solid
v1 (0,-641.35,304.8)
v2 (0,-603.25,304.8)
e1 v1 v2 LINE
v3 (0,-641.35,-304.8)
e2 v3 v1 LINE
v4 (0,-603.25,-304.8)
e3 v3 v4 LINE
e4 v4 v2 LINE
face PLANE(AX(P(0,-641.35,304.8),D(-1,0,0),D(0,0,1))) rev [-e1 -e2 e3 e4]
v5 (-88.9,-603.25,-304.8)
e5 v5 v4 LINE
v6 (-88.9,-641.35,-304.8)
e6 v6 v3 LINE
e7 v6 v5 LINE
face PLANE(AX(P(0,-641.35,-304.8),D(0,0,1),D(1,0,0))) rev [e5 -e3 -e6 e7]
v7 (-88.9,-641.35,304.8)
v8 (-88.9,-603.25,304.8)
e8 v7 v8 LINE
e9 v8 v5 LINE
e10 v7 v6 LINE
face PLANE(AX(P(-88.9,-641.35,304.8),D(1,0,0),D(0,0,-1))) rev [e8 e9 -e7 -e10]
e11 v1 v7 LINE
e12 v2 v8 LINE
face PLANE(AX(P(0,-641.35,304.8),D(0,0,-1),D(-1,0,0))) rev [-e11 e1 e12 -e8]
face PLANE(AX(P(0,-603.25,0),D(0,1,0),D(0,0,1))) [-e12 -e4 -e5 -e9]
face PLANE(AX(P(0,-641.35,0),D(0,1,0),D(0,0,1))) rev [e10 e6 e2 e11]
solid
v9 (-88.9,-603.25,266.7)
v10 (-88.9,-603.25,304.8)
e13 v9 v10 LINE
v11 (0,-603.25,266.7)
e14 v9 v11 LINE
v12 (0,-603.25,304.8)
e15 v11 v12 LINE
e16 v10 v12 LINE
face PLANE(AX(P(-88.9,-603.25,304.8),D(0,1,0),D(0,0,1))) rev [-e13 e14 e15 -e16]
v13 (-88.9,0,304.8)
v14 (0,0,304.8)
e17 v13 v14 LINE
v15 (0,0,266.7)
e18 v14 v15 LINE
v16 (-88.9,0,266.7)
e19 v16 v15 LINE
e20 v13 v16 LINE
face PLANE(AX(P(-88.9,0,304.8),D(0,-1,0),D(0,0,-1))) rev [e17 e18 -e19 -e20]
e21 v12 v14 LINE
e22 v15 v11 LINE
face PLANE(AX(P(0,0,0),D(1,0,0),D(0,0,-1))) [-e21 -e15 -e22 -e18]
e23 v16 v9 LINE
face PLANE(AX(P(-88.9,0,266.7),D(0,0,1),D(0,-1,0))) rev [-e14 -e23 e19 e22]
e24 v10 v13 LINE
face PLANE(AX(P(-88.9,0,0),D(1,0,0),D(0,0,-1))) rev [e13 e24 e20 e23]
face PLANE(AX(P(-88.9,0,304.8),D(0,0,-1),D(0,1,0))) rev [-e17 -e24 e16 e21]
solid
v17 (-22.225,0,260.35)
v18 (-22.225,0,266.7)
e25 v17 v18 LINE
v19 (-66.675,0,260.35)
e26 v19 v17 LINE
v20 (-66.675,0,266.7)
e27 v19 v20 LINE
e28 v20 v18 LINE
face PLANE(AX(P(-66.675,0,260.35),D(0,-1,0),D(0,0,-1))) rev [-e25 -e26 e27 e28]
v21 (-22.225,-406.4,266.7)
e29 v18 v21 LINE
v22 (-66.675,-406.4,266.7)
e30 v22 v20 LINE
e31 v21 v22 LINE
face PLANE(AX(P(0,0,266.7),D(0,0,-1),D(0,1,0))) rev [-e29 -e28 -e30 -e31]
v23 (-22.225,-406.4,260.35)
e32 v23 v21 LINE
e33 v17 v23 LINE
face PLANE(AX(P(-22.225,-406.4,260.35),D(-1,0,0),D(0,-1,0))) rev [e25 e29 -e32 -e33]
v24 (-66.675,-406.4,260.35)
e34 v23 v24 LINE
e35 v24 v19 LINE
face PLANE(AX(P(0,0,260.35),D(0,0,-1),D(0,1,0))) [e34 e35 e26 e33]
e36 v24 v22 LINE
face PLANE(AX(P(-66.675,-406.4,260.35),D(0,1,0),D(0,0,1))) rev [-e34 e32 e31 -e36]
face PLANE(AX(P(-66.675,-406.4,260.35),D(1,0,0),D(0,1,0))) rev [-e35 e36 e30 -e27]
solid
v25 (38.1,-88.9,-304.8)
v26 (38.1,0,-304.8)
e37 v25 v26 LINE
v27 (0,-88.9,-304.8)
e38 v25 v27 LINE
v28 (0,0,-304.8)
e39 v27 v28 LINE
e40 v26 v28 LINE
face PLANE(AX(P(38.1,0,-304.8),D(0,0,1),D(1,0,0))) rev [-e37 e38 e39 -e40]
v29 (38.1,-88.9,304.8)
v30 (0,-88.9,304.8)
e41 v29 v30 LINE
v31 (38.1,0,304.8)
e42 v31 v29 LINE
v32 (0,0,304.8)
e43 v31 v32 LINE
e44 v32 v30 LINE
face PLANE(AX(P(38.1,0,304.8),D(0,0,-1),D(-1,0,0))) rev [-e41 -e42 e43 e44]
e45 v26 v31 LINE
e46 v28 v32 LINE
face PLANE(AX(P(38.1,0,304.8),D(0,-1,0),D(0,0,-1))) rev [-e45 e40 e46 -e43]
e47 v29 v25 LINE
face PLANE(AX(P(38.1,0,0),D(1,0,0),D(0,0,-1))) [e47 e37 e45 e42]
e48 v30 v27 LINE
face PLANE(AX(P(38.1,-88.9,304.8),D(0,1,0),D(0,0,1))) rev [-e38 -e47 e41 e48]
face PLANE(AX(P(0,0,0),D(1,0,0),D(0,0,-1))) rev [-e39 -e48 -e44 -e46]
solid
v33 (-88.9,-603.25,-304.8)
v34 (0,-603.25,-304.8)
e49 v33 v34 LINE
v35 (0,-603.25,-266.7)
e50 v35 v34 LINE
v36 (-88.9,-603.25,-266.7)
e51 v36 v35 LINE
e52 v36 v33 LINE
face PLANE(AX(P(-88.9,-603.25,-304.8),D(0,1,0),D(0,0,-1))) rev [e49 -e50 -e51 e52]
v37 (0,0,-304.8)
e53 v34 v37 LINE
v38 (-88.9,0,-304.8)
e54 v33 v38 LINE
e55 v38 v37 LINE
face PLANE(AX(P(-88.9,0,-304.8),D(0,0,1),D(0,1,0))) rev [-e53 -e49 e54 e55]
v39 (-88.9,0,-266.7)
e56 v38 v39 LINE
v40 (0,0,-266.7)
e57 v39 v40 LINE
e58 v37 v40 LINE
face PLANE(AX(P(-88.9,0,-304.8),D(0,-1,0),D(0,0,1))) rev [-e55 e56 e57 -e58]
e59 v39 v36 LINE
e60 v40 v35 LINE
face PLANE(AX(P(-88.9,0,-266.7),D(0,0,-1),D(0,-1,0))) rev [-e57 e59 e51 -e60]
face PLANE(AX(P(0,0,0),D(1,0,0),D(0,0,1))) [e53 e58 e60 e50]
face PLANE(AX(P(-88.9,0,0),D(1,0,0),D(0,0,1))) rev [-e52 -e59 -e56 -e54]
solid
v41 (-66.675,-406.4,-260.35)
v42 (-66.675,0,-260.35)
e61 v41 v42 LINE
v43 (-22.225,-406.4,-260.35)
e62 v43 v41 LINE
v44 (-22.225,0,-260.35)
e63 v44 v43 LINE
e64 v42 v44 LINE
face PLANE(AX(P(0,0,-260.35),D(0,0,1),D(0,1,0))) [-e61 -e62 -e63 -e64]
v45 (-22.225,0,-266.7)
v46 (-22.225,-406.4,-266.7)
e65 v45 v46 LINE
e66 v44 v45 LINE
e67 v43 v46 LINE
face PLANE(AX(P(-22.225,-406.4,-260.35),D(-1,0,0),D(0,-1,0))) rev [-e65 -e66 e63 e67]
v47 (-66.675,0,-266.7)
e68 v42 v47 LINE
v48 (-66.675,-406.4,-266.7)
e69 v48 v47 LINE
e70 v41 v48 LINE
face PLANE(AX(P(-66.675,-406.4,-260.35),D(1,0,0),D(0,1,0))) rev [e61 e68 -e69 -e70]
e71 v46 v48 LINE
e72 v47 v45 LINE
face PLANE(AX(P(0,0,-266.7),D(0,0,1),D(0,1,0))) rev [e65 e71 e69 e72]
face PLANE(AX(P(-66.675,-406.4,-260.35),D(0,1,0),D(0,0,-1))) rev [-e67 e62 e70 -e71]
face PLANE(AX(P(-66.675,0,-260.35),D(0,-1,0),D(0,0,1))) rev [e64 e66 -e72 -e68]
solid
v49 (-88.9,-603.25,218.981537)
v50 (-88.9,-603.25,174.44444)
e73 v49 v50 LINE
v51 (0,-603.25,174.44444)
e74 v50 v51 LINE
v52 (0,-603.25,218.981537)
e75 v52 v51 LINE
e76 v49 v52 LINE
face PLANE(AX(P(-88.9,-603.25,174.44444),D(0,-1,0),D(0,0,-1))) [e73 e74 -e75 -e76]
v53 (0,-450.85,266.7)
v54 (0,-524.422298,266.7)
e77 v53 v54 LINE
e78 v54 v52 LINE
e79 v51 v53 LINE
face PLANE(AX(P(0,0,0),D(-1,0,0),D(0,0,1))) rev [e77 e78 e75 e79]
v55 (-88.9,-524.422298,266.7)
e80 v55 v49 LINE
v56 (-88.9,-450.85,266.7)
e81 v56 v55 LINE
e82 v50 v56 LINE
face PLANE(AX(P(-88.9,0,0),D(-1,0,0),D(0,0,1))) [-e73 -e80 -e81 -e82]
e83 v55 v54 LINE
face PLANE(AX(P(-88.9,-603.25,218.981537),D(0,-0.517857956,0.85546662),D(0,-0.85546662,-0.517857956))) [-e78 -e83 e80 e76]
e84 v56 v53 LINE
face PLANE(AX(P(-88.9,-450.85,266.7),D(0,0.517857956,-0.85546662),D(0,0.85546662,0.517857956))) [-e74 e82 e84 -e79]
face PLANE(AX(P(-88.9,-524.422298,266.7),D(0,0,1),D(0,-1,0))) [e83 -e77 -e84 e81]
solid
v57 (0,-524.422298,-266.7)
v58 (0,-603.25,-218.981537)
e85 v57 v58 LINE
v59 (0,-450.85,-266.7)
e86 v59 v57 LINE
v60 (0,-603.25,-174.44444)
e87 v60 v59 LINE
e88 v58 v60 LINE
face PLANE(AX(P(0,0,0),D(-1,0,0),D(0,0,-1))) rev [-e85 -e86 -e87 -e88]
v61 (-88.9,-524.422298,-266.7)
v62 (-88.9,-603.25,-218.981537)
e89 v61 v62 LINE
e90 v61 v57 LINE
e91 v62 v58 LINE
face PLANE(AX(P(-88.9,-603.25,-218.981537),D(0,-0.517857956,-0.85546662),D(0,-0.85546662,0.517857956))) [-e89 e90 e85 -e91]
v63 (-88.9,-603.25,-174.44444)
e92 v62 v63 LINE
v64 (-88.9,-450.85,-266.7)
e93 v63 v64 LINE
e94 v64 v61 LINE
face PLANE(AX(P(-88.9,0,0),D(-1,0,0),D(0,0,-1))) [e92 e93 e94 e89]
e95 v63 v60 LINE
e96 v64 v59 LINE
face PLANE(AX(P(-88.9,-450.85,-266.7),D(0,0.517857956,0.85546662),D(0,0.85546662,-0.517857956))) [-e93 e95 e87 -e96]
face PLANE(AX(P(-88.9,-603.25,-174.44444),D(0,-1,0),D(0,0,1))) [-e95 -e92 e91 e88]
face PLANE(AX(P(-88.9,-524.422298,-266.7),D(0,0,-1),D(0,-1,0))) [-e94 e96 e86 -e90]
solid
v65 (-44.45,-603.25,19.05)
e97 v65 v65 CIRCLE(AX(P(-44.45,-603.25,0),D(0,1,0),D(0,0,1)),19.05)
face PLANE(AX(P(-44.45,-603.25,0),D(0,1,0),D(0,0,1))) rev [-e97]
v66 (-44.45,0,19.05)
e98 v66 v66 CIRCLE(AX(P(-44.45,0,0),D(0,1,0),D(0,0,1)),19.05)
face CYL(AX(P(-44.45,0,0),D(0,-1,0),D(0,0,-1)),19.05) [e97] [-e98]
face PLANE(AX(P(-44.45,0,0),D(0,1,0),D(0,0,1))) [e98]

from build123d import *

# Parameters (mm, degrees)
SKETCH1_W                  = 609.6
SKETCH1_H                  = 88.9
TOP_CROSS_SUPPORT_DEPTH    = 38.1
SKETCH2_W                  = 38.1
SKETCH2_H                  = 603.25
LEG_DEPTH                  = 88.9
SKETCH7_W                  = 44.45
SKETCH7_H                  = 406.4
SLIDER_GUIDE_DEPTH         = 6.35
LEG_MIRROR_START           = -304.8
LEG_MIRROR_OUTLINE_W       = 88.9
LEG_MIRROR_OUTLINE_H       = 603.25
LEG_MIRROR_DEPTH           = 38.1
SKETCH4_W                  = 88.9
SKETCH4_H                  = 609.6
BOTTOM_CROSS_SUPPORT_DEPTH = 38.1
LOW_DIAGONAL_SUPPORT_DEPTH = 88.9
SKETCH6_R                  = 19.05
ACTUATOR_DEPTH             = 603.25


# Read off the part's stored shape, not the designer's step: Leg_Mirror
with BuildPart() as part:
    # Sketch1 → Top_Cross_Support (new body)
    with BuildSketch(Plane(origin=(0, 0, 0), x_dir=(0, 0, -1), z_dir=(1, 0, 0))):
        with Locations((0, -44.45)):
            Rectangle(SKETCH1_W, SKETCH1_H)
    extrude(amount=TOP_CROSS_SUPPORT_DEPTH)


with BuildPart() as body_2:
    # Sketch2 → Leg (new body)
    with BuildSketch(Plane.ZY):
        with Locations((285.75, -301.625)):
            Rectangle(SKETCH2_W, SKETCH2_H)
    extrude(amount=LEG_DEPTH)


with BuildPart() as body_3:
    # Sketch7 → Slider_Guide (new body)
    with BuildSketch(Plane(origin=(0, 0, 266.7), x_dir=(-1, 0, 0), z_dir=(0, 0, -1))):
        with Locations((44.45, -203.2)):
            Rectangle(SKETCH7_W, SKETCH7_H)
    extrude(amount=SLIDER_GUIDE_DEPTH)


with BuildPart() as body_4:
    # Leg_Mirror outline → Leg_Mirror (new body)
    with BuildSketch(Plane.XY.offset(LEG_MIRROR_START)):
        with Locations((-44.45, -301.625)):
            Rectangle(LEG_MIRROR_OUTLINE_W, LEG_MIRROR_OUTLINE_H)
    extrude(amount=LEG_MIRROR_DEPTH)


with BuildPart() as body_5:
    # Sketch4 → Bottom_Cross_Support (new body)
    with BuildSketch(Plane.XZ.offset(603.25)):
        with Locations((-44.45, 0)):
            Rectangle(SKETCH4_W, SKETCH4_H)
    extrude(amount=BOTTOM_CROSS_SUPPORT_DEPTH)


with BuildPart() as body_6:
    # Sketch5 → Low_Diagonal_Support (new body)
    with BuildSketch(Plane(origin=(0, 0, 0), x_dir=(0, 0, -1), z_dir=(1, 0, 0))):
        Polygon((-218.981536726, -603.25), (-266.7, -524.422298286), (-266.7, -450.85), (-174.444439521, -603.25), align=None)
    extrude(amount=-LOW_DIAGONAL_SUPPORT_DEPTH)


with BuildPart() as body_7:
    # Low_Diagonal_Support_Mirror: mirrored copy
    add(body_6.part.mirror(Plane.XY))


with BuildPart() as body_8:
    # Sketch6 → Actuator (new body)
    with BuildSketch(Plane(origin=(0, -603.25, 0), x_dir=(1, 0, 0), z_dir=(0, 1, 0))):
        with Locations(Location((-44.45, 0, 0), (0, 0, 270))):
            Circle(SKETCH6_R)
    extrude(amount=ACTUATOR_DEPTH)


with BuildPart() as body_9:
    # Mirror2: mirrored copy
    add(body_3.part.mirror(Plane.XY))


solid = Compound([part.part, body_2.part, body_3.part, body_4.part, body_5.part, body_6.part, body_7.part, body_8.part, body_9.part])
